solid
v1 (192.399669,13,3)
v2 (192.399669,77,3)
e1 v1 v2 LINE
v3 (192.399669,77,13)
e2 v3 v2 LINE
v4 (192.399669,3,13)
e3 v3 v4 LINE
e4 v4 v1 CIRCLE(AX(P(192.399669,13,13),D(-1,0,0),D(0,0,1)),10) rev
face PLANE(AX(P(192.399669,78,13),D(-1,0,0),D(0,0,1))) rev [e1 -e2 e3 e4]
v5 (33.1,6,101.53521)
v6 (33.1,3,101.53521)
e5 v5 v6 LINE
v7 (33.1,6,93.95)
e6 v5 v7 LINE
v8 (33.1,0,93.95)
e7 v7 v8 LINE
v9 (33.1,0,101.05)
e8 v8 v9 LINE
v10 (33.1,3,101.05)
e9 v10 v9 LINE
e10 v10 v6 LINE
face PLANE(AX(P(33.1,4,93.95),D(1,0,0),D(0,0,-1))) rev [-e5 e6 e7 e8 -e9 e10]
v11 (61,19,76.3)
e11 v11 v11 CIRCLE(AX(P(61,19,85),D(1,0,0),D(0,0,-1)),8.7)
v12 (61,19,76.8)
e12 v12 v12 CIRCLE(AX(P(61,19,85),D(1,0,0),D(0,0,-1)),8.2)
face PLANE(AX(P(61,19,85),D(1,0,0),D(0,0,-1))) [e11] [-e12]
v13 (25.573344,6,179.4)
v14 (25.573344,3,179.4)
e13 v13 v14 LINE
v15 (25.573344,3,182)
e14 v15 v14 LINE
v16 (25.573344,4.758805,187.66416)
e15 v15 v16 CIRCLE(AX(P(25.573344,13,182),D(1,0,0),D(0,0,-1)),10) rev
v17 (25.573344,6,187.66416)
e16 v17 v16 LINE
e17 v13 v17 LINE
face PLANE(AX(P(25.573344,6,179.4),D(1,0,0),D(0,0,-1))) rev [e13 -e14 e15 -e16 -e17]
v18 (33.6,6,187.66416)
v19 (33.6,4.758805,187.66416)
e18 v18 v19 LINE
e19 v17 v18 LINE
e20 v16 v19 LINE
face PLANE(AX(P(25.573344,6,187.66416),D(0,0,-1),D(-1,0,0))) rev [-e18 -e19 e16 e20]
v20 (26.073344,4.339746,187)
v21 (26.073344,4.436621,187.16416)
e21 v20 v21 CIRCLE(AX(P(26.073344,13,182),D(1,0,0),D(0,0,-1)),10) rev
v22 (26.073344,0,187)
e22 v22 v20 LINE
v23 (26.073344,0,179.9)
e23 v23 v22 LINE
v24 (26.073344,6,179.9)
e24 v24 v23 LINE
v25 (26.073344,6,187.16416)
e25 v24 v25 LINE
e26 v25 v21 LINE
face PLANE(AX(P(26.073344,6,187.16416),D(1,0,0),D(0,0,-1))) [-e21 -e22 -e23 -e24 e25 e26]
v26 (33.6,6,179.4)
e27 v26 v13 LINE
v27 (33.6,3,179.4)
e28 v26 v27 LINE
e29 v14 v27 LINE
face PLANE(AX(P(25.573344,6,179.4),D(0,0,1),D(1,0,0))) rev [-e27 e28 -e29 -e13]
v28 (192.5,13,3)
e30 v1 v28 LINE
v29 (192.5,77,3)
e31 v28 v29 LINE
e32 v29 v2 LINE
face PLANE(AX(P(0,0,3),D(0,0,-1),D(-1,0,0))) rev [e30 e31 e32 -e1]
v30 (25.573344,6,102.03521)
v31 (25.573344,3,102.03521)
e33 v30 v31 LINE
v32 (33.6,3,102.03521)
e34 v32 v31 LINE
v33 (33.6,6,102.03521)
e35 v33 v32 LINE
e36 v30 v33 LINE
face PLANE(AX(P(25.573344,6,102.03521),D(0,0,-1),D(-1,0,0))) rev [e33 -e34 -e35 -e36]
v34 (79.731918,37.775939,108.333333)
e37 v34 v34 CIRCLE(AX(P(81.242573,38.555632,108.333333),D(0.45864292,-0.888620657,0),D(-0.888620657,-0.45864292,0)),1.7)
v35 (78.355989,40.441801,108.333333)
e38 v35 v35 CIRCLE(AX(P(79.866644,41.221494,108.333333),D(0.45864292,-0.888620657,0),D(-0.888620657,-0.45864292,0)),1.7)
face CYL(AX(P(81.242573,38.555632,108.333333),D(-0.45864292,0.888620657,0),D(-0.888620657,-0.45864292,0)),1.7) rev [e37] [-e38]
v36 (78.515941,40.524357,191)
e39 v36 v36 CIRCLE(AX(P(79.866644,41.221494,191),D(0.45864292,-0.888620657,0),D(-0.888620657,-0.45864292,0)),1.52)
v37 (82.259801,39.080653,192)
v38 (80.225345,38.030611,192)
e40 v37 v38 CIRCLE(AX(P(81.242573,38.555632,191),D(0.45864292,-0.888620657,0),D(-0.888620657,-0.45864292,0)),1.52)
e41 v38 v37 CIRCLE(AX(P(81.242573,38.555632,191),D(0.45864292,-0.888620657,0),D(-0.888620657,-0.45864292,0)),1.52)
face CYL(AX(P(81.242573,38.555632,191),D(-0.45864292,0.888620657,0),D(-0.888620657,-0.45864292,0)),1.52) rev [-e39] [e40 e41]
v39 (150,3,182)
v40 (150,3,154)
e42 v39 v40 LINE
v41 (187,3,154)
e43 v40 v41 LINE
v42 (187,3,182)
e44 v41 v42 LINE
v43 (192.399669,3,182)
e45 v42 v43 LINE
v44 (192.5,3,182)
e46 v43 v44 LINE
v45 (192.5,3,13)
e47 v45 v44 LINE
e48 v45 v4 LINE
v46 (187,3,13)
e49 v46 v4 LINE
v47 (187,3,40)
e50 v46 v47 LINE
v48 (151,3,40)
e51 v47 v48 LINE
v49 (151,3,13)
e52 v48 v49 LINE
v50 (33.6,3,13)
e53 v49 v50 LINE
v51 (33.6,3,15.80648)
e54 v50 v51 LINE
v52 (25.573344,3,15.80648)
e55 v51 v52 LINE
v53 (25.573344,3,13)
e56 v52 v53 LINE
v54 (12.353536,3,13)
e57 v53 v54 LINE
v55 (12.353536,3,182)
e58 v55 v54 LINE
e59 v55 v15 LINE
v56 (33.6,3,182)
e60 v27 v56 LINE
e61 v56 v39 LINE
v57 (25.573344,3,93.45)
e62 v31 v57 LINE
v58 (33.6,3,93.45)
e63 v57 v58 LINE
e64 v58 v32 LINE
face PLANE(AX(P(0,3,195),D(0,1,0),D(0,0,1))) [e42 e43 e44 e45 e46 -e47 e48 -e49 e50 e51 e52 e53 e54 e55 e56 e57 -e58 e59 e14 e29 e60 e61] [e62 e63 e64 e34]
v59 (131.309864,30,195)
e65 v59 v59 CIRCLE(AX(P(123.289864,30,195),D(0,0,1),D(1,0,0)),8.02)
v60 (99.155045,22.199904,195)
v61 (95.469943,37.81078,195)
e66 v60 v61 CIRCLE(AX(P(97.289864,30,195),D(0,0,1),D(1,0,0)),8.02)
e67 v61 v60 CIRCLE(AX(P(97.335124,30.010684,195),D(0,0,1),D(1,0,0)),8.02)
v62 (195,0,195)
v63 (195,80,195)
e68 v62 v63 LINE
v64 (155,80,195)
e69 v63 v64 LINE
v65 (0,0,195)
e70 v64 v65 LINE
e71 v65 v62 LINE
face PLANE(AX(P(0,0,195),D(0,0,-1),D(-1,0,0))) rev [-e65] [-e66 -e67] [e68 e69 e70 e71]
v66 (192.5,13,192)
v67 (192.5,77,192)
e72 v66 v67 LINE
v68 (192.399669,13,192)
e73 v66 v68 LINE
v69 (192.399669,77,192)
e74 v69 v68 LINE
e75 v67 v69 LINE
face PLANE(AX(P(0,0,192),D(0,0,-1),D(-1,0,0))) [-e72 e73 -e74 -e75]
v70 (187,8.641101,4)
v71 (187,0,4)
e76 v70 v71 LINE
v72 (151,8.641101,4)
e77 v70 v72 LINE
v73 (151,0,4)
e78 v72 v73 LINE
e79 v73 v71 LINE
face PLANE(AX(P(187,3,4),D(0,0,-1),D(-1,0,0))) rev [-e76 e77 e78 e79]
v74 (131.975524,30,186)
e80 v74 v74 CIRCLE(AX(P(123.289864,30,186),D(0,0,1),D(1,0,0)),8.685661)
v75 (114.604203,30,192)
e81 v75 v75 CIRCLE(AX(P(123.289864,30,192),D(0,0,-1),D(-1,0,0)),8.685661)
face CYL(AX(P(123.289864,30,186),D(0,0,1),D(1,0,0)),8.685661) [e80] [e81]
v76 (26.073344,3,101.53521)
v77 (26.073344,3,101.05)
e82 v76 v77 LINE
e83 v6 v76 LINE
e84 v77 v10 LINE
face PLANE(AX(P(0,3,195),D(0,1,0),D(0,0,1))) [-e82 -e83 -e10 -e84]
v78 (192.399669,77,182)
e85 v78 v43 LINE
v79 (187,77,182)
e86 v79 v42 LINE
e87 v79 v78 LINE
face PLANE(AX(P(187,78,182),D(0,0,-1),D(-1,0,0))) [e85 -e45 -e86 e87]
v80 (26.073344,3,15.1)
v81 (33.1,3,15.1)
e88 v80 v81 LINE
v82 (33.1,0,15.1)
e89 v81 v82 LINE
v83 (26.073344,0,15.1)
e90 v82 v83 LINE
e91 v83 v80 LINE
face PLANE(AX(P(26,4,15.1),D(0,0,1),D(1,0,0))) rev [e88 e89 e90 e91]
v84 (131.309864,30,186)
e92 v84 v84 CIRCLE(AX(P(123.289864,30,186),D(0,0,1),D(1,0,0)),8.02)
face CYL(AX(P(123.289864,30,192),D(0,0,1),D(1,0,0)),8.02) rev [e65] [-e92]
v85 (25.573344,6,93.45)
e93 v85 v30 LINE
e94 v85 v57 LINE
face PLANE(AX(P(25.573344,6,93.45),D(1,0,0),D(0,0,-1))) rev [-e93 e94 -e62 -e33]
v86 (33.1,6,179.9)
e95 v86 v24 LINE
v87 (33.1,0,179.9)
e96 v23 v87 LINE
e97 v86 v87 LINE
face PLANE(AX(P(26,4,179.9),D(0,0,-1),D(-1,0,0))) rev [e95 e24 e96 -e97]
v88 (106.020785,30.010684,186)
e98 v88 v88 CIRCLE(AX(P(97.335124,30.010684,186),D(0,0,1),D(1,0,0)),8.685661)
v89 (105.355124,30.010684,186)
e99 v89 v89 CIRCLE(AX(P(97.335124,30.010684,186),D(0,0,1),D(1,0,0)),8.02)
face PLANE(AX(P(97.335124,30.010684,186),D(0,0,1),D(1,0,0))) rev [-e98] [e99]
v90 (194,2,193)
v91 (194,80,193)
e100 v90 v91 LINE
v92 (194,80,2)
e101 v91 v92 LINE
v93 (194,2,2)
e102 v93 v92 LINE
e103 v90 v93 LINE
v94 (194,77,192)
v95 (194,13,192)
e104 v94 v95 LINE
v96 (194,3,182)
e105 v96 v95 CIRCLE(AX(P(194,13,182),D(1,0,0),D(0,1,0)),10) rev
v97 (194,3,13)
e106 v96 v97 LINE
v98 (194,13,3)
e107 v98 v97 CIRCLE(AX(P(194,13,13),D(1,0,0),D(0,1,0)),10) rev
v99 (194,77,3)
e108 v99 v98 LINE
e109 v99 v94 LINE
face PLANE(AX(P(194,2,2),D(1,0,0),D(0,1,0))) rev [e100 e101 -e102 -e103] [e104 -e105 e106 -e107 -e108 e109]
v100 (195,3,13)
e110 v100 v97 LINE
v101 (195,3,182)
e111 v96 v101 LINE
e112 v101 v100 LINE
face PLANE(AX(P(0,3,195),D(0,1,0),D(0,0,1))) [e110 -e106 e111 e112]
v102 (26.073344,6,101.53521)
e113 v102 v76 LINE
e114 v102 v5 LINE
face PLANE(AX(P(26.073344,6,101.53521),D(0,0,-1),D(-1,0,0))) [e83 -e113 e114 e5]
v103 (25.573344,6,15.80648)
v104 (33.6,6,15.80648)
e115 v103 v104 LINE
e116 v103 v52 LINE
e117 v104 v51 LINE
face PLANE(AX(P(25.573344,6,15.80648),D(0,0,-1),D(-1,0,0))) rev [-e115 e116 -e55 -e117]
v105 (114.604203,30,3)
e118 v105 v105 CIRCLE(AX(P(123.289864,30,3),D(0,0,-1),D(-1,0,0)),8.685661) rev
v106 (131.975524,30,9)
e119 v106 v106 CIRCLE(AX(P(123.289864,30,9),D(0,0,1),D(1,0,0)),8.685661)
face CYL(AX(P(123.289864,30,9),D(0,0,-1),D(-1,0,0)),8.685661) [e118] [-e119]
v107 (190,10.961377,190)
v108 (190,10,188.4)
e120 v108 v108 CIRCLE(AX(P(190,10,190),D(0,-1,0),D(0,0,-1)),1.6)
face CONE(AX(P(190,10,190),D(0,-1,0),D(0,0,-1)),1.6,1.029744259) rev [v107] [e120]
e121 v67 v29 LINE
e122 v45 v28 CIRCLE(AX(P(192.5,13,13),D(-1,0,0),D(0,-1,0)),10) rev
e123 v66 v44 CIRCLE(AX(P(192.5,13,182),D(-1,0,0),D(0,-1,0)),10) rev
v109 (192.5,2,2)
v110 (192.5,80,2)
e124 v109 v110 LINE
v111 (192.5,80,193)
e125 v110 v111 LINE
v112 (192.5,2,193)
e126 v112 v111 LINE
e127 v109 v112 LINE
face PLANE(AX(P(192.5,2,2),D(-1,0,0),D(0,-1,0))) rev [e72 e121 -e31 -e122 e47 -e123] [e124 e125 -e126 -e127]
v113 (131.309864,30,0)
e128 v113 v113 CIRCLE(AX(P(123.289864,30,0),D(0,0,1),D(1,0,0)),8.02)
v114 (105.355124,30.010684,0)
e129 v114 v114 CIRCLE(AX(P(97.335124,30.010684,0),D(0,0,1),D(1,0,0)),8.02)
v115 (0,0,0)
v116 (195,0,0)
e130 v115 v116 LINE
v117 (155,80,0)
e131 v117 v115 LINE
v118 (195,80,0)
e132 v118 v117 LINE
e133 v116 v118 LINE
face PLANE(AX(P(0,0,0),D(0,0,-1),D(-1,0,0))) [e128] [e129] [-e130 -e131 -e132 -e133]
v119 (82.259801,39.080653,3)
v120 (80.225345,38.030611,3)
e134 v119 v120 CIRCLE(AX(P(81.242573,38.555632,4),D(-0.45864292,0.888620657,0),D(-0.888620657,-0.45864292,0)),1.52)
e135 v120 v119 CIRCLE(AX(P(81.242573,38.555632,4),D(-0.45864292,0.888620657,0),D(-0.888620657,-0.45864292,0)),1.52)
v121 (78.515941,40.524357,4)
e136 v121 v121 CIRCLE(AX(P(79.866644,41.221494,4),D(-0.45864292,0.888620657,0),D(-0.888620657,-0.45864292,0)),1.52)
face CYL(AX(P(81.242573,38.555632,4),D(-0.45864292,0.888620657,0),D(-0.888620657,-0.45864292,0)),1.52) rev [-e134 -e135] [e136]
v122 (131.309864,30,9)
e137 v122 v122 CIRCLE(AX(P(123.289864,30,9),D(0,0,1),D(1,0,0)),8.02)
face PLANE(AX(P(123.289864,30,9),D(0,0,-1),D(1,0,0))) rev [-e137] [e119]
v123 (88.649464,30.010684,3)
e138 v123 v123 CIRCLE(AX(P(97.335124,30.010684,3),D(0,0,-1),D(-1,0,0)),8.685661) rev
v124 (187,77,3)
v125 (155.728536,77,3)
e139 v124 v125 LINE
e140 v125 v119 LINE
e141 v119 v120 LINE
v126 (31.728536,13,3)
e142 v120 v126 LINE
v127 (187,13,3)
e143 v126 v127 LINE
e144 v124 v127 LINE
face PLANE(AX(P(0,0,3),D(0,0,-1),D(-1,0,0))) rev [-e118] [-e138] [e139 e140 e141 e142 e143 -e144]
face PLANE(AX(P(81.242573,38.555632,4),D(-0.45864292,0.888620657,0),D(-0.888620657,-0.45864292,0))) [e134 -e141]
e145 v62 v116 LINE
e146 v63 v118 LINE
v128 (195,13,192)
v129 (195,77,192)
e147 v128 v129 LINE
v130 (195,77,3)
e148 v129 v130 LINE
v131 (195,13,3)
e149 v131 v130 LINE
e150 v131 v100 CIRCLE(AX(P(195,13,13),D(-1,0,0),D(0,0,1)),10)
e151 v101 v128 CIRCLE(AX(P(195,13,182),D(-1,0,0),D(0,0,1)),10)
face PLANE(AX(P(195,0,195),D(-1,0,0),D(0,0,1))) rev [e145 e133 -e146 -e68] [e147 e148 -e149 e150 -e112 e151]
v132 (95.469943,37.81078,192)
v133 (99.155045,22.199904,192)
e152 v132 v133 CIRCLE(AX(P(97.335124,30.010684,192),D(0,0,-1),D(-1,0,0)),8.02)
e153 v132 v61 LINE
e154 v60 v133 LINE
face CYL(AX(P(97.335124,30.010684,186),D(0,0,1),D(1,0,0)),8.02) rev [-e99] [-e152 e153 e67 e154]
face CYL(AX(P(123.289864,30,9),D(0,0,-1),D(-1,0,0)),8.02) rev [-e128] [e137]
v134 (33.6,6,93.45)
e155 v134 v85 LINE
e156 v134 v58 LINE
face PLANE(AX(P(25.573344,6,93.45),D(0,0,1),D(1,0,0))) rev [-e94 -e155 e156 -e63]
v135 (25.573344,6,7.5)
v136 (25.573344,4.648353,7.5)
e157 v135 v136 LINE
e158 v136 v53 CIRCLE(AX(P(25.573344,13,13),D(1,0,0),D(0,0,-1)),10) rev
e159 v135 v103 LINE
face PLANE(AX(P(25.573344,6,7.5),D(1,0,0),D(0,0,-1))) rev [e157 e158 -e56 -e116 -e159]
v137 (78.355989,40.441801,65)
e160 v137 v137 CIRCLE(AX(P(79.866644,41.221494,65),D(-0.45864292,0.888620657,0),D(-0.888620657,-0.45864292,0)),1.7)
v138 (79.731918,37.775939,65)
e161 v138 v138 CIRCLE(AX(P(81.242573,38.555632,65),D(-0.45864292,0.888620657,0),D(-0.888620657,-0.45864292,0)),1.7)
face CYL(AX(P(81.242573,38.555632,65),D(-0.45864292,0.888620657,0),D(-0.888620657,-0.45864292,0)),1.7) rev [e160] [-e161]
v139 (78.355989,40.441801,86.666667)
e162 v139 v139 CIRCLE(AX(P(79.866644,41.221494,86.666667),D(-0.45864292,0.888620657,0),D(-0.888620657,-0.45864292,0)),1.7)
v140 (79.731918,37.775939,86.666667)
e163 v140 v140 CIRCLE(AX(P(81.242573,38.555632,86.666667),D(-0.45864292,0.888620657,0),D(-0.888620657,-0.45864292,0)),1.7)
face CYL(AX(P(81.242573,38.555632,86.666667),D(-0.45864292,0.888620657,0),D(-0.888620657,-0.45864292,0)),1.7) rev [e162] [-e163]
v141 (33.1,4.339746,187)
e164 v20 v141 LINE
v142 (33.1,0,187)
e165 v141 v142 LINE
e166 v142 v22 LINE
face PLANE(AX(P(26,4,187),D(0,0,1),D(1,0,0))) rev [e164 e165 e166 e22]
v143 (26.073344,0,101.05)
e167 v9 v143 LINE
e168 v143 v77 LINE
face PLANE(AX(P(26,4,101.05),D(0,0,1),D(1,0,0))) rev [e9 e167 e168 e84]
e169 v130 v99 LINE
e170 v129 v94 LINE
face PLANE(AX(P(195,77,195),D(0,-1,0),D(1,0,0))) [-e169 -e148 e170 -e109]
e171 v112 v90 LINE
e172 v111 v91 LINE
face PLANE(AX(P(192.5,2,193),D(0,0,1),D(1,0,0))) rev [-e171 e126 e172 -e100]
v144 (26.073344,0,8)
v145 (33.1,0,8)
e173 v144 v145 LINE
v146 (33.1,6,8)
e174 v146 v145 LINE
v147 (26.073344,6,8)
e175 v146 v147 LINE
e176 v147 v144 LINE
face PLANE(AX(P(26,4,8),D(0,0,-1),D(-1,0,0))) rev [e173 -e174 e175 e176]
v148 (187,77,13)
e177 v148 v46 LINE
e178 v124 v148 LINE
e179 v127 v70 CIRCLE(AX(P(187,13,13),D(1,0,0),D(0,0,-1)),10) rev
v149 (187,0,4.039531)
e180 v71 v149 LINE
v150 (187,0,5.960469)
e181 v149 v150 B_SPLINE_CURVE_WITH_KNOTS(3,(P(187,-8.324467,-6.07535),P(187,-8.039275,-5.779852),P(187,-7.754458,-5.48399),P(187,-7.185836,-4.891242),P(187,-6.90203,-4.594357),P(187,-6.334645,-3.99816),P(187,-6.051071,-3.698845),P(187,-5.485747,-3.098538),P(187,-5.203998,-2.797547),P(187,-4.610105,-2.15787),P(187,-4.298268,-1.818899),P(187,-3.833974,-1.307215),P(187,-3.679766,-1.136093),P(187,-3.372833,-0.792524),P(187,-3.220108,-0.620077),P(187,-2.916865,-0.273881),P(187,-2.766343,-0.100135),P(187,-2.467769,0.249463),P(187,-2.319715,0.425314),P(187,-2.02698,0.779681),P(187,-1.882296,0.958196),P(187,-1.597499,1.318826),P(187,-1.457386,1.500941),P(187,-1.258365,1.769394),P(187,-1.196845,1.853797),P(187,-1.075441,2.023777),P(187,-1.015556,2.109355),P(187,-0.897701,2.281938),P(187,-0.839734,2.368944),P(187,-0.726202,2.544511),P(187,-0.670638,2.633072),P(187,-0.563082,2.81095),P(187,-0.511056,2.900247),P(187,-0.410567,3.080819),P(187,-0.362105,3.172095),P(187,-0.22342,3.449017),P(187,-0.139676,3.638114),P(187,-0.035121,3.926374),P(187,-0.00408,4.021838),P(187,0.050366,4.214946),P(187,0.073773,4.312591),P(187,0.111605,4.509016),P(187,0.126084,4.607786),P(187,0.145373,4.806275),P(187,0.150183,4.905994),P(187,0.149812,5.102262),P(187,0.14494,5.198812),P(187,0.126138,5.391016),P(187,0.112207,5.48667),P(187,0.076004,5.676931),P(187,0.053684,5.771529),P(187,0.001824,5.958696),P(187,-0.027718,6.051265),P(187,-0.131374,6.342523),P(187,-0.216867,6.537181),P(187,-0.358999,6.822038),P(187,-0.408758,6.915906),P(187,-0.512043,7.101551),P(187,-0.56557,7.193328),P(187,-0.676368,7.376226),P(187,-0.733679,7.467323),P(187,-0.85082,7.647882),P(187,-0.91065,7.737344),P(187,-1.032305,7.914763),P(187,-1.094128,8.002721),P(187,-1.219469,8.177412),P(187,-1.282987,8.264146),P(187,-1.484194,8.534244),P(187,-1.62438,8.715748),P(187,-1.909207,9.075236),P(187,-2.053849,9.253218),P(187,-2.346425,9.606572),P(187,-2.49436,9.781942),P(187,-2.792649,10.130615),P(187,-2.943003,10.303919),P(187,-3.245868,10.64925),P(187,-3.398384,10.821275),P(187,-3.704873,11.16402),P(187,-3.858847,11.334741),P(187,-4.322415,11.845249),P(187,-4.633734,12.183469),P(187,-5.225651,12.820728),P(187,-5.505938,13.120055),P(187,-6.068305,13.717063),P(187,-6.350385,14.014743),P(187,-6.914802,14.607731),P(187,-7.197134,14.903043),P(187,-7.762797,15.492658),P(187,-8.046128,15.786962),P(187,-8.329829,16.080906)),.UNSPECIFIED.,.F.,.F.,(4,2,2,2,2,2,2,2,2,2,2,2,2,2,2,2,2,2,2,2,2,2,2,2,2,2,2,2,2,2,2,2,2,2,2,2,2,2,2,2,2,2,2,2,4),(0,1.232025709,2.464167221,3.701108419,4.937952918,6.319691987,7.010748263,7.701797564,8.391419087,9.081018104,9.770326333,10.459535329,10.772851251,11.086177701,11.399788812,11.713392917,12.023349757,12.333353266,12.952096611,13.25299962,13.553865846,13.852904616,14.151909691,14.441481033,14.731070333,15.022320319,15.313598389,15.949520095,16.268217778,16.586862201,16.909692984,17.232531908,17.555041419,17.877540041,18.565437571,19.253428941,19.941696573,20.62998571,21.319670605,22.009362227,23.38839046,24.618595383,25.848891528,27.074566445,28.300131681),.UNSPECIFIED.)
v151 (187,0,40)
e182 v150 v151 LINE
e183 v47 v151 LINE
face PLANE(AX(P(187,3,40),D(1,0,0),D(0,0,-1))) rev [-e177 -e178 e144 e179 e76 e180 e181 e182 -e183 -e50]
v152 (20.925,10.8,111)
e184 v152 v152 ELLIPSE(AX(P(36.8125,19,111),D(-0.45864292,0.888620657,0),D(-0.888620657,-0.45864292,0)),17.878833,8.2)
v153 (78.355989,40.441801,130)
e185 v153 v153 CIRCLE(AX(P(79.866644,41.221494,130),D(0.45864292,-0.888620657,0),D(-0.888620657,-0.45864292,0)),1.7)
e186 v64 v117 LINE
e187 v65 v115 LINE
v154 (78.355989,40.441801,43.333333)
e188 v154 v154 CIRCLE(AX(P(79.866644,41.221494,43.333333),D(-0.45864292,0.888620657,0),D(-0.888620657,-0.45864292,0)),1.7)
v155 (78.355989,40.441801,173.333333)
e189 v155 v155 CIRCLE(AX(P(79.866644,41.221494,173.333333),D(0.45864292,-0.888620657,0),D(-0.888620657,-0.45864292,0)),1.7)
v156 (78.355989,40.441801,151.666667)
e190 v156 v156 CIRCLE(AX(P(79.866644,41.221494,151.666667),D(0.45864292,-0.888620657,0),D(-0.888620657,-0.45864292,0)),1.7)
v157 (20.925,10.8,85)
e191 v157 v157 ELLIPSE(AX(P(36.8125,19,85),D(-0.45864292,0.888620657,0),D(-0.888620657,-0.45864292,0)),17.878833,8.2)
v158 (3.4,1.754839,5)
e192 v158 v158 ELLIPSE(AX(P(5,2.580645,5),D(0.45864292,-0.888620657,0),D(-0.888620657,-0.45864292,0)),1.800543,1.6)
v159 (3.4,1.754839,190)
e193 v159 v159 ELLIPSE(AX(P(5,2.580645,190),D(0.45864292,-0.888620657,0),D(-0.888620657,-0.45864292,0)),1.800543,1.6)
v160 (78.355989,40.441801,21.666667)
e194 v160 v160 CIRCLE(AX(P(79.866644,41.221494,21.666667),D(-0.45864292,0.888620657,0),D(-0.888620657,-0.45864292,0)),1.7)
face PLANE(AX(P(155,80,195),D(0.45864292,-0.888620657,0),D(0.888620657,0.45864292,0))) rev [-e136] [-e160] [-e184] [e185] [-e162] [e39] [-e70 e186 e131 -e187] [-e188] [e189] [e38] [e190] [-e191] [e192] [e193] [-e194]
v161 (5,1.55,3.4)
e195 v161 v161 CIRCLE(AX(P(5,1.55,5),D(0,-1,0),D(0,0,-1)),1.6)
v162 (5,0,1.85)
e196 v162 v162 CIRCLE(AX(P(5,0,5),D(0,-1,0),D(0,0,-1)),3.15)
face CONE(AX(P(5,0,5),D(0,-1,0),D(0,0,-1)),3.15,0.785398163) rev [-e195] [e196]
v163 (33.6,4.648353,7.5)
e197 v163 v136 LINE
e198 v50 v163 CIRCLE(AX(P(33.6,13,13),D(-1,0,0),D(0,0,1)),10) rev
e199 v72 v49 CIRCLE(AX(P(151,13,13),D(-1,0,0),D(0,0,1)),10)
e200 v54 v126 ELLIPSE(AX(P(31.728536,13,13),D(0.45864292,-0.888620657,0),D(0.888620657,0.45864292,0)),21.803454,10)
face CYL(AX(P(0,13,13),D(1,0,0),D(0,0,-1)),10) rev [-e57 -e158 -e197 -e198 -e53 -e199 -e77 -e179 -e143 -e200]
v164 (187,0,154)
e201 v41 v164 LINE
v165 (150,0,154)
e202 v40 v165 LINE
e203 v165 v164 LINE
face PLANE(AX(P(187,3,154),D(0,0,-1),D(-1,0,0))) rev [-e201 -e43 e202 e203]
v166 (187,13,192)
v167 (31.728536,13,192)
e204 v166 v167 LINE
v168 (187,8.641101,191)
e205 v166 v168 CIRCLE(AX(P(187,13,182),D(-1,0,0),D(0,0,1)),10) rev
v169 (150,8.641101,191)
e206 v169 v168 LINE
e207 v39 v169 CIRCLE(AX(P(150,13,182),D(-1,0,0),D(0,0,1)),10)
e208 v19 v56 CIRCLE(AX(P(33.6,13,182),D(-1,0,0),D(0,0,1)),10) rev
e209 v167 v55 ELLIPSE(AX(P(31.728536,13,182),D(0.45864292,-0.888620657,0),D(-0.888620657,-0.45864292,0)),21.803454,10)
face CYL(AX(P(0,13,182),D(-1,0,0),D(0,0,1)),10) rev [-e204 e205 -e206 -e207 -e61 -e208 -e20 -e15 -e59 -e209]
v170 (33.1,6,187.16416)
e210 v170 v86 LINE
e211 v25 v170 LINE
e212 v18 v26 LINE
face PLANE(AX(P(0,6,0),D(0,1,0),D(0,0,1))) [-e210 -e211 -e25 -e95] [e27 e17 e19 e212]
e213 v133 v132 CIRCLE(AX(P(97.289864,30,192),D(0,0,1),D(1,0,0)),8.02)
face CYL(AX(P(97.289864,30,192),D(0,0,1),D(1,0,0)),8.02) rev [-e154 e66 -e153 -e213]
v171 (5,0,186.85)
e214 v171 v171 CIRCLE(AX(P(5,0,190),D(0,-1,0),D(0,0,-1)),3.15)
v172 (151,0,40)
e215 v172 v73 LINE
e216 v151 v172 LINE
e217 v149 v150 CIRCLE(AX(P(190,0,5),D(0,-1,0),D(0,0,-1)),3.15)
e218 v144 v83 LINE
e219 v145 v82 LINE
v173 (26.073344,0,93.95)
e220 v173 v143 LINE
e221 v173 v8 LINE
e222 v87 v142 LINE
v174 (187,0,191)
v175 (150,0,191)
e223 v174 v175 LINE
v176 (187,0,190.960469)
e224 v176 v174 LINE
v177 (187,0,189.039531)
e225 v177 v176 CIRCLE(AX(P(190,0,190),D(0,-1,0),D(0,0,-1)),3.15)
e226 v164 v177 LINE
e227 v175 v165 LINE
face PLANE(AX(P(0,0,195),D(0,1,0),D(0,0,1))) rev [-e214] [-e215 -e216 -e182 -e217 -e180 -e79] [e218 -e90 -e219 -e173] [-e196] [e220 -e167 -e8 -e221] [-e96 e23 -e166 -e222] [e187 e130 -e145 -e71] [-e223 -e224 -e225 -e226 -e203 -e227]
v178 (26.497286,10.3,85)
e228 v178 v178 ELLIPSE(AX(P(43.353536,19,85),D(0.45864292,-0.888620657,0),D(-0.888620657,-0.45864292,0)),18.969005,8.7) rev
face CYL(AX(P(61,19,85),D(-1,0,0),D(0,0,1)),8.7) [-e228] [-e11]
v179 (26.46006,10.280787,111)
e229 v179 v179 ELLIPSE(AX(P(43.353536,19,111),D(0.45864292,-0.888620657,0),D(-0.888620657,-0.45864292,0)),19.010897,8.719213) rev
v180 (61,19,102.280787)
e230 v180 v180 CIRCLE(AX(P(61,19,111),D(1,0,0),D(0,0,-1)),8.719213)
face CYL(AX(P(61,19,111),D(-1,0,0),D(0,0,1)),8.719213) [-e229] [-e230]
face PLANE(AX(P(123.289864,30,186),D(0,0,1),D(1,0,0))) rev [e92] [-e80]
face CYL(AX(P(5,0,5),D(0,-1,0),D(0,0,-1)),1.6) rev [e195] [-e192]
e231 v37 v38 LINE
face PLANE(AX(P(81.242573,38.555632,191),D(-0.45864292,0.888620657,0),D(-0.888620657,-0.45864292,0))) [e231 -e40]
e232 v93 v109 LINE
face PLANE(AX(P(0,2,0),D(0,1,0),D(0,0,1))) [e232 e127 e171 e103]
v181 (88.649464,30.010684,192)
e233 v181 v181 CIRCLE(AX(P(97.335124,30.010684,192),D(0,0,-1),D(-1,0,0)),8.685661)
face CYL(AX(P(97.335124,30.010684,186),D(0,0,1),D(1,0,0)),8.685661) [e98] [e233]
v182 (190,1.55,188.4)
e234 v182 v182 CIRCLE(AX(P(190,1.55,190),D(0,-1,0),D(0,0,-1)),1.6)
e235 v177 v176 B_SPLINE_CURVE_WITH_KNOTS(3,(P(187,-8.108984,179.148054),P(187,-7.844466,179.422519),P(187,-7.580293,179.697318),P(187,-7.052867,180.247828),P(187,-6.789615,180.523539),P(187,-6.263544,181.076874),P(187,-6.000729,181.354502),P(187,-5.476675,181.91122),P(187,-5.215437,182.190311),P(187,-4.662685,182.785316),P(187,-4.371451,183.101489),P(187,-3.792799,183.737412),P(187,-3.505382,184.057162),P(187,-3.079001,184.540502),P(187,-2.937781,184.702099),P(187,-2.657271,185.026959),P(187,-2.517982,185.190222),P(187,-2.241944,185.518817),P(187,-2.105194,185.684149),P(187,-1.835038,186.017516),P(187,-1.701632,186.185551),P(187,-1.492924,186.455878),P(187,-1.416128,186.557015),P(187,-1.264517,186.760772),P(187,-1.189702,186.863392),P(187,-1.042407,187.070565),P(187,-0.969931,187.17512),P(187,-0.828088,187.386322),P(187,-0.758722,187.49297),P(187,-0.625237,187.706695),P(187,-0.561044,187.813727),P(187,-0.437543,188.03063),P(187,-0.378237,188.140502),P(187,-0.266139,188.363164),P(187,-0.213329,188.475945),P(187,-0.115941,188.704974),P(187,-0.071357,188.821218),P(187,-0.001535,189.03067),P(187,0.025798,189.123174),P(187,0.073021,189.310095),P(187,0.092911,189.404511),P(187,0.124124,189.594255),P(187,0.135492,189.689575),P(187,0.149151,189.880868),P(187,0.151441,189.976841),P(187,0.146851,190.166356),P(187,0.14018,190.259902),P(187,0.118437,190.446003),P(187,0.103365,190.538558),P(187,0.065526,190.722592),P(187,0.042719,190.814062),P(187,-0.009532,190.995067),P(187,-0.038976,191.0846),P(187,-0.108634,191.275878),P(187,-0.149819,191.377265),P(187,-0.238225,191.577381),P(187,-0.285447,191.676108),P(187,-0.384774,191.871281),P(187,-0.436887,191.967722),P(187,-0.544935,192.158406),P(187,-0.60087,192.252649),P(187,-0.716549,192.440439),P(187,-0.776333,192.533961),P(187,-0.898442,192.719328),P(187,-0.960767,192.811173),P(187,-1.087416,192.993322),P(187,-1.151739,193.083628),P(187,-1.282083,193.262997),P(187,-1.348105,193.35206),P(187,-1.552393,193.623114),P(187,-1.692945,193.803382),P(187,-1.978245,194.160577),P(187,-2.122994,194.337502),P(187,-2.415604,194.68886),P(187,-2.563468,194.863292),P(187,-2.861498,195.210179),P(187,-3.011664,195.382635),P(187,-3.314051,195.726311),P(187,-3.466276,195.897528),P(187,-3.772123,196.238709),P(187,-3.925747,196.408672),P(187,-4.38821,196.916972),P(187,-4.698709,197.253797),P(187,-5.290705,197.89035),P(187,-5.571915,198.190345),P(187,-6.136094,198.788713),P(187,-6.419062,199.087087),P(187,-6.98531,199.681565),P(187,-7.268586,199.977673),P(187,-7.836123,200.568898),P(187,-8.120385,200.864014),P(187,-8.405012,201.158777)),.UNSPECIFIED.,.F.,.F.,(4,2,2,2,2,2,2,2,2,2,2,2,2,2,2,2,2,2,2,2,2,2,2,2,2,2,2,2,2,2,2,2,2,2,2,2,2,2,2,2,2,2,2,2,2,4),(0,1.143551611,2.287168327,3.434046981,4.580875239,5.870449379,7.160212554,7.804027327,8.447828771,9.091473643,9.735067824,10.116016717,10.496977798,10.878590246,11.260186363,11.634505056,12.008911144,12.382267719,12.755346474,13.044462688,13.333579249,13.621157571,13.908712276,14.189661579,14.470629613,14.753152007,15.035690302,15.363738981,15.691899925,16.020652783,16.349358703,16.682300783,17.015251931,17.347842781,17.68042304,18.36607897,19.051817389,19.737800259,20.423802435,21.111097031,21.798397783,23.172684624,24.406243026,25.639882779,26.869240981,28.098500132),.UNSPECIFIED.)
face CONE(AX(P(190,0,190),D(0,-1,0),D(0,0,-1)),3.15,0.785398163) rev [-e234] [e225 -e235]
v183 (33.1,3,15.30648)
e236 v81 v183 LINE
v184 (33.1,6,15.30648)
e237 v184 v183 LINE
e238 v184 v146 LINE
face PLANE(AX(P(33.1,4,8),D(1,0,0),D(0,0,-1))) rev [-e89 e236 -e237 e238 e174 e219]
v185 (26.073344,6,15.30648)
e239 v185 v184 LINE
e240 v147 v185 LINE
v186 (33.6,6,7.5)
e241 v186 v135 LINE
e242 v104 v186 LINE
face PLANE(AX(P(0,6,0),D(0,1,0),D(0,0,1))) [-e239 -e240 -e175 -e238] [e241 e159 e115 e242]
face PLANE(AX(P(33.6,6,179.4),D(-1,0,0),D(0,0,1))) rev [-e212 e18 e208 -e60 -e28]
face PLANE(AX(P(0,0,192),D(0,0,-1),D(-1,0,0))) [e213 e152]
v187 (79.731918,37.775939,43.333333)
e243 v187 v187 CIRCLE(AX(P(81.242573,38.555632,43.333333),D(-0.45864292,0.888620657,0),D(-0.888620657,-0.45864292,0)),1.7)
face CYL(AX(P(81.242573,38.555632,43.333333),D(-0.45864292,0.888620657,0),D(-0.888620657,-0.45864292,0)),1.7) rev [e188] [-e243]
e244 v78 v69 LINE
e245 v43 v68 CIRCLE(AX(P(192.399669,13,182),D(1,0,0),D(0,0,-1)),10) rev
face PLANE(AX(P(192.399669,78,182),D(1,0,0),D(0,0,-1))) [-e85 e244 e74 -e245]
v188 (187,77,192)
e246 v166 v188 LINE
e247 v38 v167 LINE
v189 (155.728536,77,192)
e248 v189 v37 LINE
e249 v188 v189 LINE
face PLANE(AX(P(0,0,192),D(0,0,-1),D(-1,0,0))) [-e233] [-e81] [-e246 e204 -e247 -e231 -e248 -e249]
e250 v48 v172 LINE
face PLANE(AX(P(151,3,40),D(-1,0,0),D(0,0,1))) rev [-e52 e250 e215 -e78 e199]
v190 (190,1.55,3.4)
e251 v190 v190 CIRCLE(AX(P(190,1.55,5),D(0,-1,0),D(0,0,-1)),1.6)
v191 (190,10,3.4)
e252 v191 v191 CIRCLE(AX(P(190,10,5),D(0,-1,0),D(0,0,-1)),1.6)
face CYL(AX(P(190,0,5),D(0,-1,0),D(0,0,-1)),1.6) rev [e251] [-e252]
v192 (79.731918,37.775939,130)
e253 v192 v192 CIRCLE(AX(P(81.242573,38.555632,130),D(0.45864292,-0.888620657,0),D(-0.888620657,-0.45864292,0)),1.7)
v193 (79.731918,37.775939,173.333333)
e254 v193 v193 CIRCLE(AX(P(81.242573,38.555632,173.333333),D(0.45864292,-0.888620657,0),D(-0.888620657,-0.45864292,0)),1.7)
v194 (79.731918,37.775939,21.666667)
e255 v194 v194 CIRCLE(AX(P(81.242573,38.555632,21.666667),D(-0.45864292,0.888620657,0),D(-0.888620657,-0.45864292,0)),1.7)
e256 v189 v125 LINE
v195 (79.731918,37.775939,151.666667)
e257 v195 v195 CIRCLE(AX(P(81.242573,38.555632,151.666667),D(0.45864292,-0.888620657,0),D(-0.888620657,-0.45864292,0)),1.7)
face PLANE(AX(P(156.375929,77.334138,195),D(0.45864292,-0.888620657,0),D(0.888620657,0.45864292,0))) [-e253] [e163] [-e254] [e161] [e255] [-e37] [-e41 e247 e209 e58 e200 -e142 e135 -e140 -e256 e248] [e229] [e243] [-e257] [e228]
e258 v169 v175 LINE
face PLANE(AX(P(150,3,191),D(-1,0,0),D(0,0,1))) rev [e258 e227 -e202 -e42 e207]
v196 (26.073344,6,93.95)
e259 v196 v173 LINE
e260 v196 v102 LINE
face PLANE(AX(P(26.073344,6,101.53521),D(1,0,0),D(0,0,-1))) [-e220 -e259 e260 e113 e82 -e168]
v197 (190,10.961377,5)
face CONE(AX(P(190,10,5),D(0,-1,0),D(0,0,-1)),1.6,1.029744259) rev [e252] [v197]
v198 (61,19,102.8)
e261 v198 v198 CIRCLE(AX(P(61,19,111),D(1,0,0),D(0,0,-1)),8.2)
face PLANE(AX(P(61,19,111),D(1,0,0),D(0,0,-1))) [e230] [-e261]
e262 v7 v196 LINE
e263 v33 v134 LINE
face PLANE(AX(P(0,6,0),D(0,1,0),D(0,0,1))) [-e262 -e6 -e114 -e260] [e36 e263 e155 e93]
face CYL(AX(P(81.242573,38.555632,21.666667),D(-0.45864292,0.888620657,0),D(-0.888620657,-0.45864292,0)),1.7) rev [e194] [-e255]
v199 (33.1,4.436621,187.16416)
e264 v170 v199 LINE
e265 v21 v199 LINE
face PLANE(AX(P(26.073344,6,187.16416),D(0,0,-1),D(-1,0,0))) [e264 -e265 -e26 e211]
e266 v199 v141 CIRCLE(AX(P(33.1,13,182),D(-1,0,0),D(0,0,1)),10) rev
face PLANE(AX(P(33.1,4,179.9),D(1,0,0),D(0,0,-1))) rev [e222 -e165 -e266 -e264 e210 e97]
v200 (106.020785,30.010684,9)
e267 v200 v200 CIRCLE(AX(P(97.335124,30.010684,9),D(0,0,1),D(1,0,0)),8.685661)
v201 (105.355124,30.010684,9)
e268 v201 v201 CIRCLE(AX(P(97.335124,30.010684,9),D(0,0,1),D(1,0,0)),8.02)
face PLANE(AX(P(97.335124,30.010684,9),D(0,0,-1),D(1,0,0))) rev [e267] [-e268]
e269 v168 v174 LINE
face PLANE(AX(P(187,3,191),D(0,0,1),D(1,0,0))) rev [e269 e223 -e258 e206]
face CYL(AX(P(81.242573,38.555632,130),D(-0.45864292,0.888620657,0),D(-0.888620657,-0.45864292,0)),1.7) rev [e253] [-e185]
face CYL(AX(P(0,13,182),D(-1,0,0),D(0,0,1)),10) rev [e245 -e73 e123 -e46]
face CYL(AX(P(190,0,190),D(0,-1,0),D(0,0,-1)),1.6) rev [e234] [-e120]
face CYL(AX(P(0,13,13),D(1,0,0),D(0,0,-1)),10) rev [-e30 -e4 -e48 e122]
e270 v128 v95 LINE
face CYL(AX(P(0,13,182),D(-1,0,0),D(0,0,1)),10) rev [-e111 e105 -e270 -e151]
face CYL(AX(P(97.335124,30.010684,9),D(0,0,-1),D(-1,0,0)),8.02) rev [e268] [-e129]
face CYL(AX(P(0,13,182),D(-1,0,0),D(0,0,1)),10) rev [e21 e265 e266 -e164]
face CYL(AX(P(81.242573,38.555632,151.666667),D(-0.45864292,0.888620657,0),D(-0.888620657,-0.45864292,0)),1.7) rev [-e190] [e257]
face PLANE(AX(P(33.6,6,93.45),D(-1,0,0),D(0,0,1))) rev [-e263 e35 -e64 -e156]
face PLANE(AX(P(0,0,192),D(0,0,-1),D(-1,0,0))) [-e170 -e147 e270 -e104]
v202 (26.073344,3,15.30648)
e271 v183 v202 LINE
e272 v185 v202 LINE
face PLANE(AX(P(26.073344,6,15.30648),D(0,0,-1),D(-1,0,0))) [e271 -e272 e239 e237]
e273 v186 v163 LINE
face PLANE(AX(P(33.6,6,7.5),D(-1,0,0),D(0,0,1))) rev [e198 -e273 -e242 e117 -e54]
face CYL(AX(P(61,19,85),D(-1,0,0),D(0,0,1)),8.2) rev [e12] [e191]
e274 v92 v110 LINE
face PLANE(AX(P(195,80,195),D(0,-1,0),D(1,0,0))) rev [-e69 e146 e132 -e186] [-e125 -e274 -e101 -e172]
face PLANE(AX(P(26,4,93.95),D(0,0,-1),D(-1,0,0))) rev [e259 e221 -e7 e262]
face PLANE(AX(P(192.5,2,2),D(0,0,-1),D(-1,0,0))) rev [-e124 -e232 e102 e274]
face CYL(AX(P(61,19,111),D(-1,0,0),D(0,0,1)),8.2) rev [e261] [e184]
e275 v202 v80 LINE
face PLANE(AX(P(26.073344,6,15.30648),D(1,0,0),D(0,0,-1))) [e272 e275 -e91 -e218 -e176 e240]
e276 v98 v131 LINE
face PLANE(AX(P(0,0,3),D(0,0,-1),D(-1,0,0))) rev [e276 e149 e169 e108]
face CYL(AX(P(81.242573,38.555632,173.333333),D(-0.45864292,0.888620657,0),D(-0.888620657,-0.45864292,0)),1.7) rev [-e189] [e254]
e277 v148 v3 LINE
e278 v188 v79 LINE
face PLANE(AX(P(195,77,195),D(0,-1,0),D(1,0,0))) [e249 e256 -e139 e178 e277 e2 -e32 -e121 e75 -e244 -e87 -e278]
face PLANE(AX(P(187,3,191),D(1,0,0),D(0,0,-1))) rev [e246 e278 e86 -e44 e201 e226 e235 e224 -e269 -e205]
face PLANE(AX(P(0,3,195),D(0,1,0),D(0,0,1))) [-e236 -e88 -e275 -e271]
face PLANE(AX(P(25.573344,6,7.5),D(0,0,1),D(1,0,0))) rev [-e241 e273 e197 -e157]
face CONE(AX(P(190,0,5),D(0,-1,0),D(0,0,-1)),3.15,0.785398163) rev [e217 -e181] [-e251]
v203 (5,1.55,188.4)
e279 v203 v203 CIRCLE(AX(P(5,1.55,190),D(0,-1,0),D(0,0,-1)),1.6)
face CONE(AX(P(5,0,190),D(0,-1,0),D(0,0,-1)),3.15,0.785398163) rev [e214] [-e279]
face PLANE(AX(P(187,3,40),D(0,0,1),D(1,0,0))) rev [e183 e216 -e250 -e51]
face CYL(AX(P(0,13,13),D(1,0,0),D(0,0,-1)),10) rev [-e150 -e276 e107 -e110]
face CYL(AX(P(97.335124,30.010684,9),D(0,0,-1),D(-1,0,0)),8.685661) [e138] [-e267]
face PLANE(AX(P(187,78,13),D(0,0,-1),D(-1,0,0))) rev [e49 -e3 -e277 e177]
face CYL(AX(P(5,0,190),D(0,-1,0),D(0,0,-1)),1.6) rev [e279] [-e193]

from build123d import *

# Parameters (mm, degrees)
ROBOT_DEPTH                 = 195
VACIO_POR_DENTRO_3MM_T      = -3
SKETCH3_R                   = 8.02
ULTRASONICO_DERECHA_DEPTH   = 3
SKETCH9_R                   = 8.2
ULTRASONICO_IZQUIERDA_DEPTH = 3
ULTRASONICO_CENTRO_R        = 8.7
CUT_EXTRUDE4_DEPTH          = 75
SKETCH16_R                  = 8.685660505
SKETCH16_R_2                = 8.02
BOSS_EXTRUDE1_DEPTH         = 9
SKETCH18_R                  = 8.7
SKETCH18_R_2                = 8.2
SKETCH18_R_3                = 8.719213476
BOSS_EXTRUDE2_DEPTH         = 60
SKETCH10_W                  = 37
SKETCH10_H                  = 37
RUEDA_DERECHA_DEPTH         = 3
SKETCH12_W                  = 36
SKETCH12_H                  = 36
RUEDA_IZQUIERDA_DEPTH       = 3
SKETCH14_W                  = 7.1
SKETCH14_H                  = 7.1
CYN70_DERECHA_DEPTH         = 4
SKETCH15_W                  = 7.1
SKETCH15_H                  = 7.1
CNY70_CENTRO_DEPTH          = 4
SKETCH13_W                  = 7.1
SKETCH13_H                  = 7.1
CNY70_IZQUIERDA_DEPTH       = 4
RDONDEO_R                   = 10
SKETCH23_W                  = 76.592532913
SKETCH23_H                  = 65.967934853
CUT_EXTRUDE5_DEPTH          = 25
SKETCH24_W                  = 1.5
SKETCH24_H                  = 191
CUT_EXTRUDE6_DEPTH          = 78
SKETCH25_W                  = 5.39966948
SKETCH25_H                  = 12.093031456
BOSS_EXTRUDE3_DEPTH         = 75
SKETCH38_W                  = 8.026655699
SKETCH38_H                  = 8.306480136
SKETCH38_W_2                = 7.026655699
SKETCH38_H_2                = 7.306480136
SKETCH38_H_3                = 8.585210253
SKETCH38_H_4                = 7.585210253
SKETCH38_H_5                = 8.264160011
SKETCH38_H_6                = 7.264160011
BOSS_EXTRUDE4_DEPTH         = 6
SKETCH40_R                  = 1.7
SKETCH40_R_2                = 1.52
AGUJEROS_RAMPA_DEPTH        = 3


with BuildPart() as part:
    # Sketch2 → Robot (new body)
    with BuildSketch(Plane.XY):
        Polygon((0, 0), (195, 0), (195, 80), (155, 80), align=None)
    extrude(amount=ROBOT_DEPTH)

    # Vacio por dentro 3mm
    vacio_por_dentro_3mm_openings = [part.faces().sort_by_distance(p)[0] for p in [
        (195, 40, 97.5),
    ]]
    offset(amount=VACIO_POR_DENTRO_3MM_T, openings=vacio_por_dentro_3mm_openings, kind=Kind.INTERSECTION)

    # Sketch3 → Ultrasonico Derecha (cut)
    with BuildSketch(Plane.XY.offset(195)):
        with Locations((97.289863967, 30)):
            Circle(SKETCH3_R)
        with Locations((123.289863967, 30)):
            Circle(SKETCH3_R)
    extrude(amount=-ULTRASONICO_DERECHA_DEPTH, mode=Mode.SUBTRACT)

    # Sketch9 → Ultrasonico Izquierda (cut)
    with BuildSketch(Plane(origin=(0, 0, 0), x_dir=(-1, 0, 0), z_dir=(0, 0, -1))):
        with Locations((-97.284004153, 30)):
            Circle(SKETCH9_R)
        with Locations((-123.284004153, 30)):
            Circle(SKETCH9_R)
    extrude(amount=-ULTRASONICO_IZQUIERDA_DEPTH, mode=Mode.SUBTRACT)

    # Ultrasonico Centro → Cut-Extrude4 (cut)
    with BuildSketch(Plane(origin=(0, 0, 0), x_dir=(0, 0, -1), z_dir=(1, 0, 0))):
        with Locations(Location((-85, 19, 0), (0, 0, 270))):
            Circle(ULTRASONICO_CENTRO_R)
        with Locations(Location((-111, 19, 0), (0, 0, 270))):
            Circle(ULTRASONICO_CENTRO_R)
    extrude(amount=CUT_EXTRUDE4_DEPTH, mode=Mode.SUBTRACT)

    # Sketch16 → Boss-Extrude1 (add)
    # profile 1 of 2: a face of its own
    with BuildSketch(Plane.XY.offset(195)):
        with Locations((123.289863967, 30)):
            Circle(SKETCH16_R)
        with Locations((123.289863967, 30)):
            Circle(SKETCH16_R_2, mode=Mode.SUBTRACT)
    # profile 2 of 2: a face of its own
    with BuildSketch(Plane.XY.offset(195)):
        with Locations((97.335124092, 30.010684101)):
            Circle(SKETCH16_R)
        with Locations((97.335124092, 30.010684101)):
            Circle(SKETCH16_R_2, mode=Mode.SUBTRACT)
    boss_extrude1 = extrude(amount=-BOSS_EXTRUDE1_DEPTH)

    # Sketch18 → Boss-Extrude2 (add)
    # profile 1 of 2: a face of its own
    with BuildSketch(Plane(origin=(1, 0, 0), x_dir=(0, 0, -1), z_dir=(1, 0, 0))):
        with Locations(Location((-85, 19, 0), (0, 0, 270))):
            Circle(SKETCH18_R)
        with Locations((-85, 19)):
            Circle(SKETCH18_R_2, mode=Mode.SUBTRACT)
    # profile 2 of 2: a face of its own
    with BuildSketch(Plane(origin=(1, 0, 0), x_dir=(0, 0, -1), z_dir=(1, 0, 0))):
        with Locations(Location((-111, 19, 0), (0, 0, 270))):
            Circle(SKETCH18_R_3)
        with Locations((-111, 19)):
            Circle(SKETCH18_R_2, mode=Mode.SUBTRACT)
    extrude(amount=BOSS_EXTRUDE2_DEPTH)

    # Mirror1: Boss-Extrude1 across plane
    add(boss_extrude1.mirror(Plane.XY.offset(97.5)))

    # Sketch10 → Rueda Derecha (cut)
    with BuildSketch(Plane(origin=(0, 0, 0), x_dir=(-1, 0, 0), z_dir=(0, -1, 0))):
        with Locations((-168.5, -172.5)):
            Rectangle(SKETCH10_W, SKETCH10_H)
    extrude(amount=-RUEDA_DERECHA_DEPTH, mode=Mode.SUBTRACT)

    # Sketch12 → Rueda Izquierda (cut)
    with BuildSketch(Plane(origin=(0, 0, 0), x_dir=(-1, 0, 0), z_dir=(0, -1, 0))):
        with Locations((-169, -22)):
            Rectangle(SKETCH12_W, SKETCH12_H)
    extrude(amount=-RUEDA_IZQUIERDA_DEPTH, mode=Mode.SUBTRACT)

    # Sketch14 → Cyn70 Derecha (cut)
    with BuildSketch(Plane(origin=(0, 0, 0), x_dir=(-1, 0, 0), z_dir=(0, -1, 0))):
        with Locations((-29.55, -183.45)):
            Rectangle(SKETCH14_W, SKETCH14_H)
    extrude(amount=-CYN70_DERECHA_DEPTH, mode=Mode.SUBTRACT)

    # Sketch15 → Cny70 Centro (cut)
    with BuildSketch(Plane(origin=(0, 0, 0), x_dir=(-1, 0, 0), z_dir=(0, -1, 0))):
        with Locations((-29.55, -97.5)):
            Rectangle(SKETCH15_W, SKETCH15_H)
    extrude(amount=-CNY70_CENTRO_DEPTH, mode=Mode.SUBTRACT)

    # Sketch13 → Cny70 Izquierda (cut)
    with BuildSketch(Plane.XZ):
        with Locations((29.55, 11.55)):
            Rectangle(SKETCH13_W, SKETCH13_H)
    extrude(amount=-CNY70_IZQUIERDA_DEPTH, mode=Mode.SUBTRACT)

    # Rdondeo
    # the kernel refuses this fillet: 10 mm, written as the material it adds along each edge
    with BuildSketch(Plane(origin=(-12.646463672, 3, 3), x_dir=(0, 0, 1), z_dir=(1, 0, 0))) as rdondeo_piece_1_section:
        with BuildLine():
            CenterArc((RDONDEO_R, -RDONDEO_R), RDONDEO_R, 90, 90)
            Line((0, -RDONDEO_R), (0, 0))
            Line((0, 0), (RDONDEO_R, 0))
        make_face()
    rdondeo_piece_1 = extrude(amount=232.646463672, mode=Mode.PRIVATE)
    rdondeo_piece_1 = split(rdondeo_piece_1, bisect_by=Plane(origin=(26, 3.382720795, 9.257724248), z_dir=(-1, 0, 0)), keep=Keep.TOP, mode=Mode.PRIVATE)
    rdondeo_piece_1 = split(rdondeo_piece_1, bisect_by=Plane(origin=(18.190230172, 6.012487145, 9.257724248), z_dir=(0.4586429197702524, -0.8886206570548638, 0)), keep=Keep.TOP, mode=Mode.PRIVATE)
    add(rdondeo_piece_1)
    with BuildSketch(Plane(origin=(-12.646463672, 3, 3), x_dir=(0, 0, 1), z_dir=(1, 0, 0))) as rdondeo_piece_2_section:
        with BuildLine():
            CenterArc((RDONDEO_R, -RDONDEO_R), RDONDEO_R, 90, 90)
            Line((0, -RDONDEO_R), (0, 0))
            Line((0, 0), (RDONDEO_R, 0))
        make_face()
    rdondeo_piece_2 = extrude(amount=232.646463672, mode=Mode.PRIVATE)
    rdondeo_piece_2 = split(rdondeo_piece_2, bisect_by=Plane(origin=(29.55, 4.766890381, 8), z_dir=(0, 0, -1)), keep=Keep.TOP, mode=Mode.PRIVATE)
    rdondeo_piece_2 = split(rdondeo_piece_2, bisect_by=Plane(origin=(151, 4.766890381, 5.549307676), z_dir=(-1, 0, 0)), keep=Keep.TOP, mode=Mode.PRIVATE)
    rdondeo_piece_2 = split(rdondeo_piece_2, bisect_by=Plane(origin=(26.652779728, 10.380254658, 5.549307676), z_dir=(0.4586429197702524, -0.8886206570548638, 0)), keep=Keep.TOP, mode=Mode.PRIVATE)
    add(rdondeo_piece_2)
    with BuildSketch(Plane(origin=(-12.646463672, 3, 3), x_dir=(0, 0, 1), z_dir=(1, 0, 0))) as rdondeo_piece_3_section:
        with BuildLine():
            CenterArc((RDONDEO_R, -RDONDEO_R), RDONDEO_R, 90, 90)
            Line((0, -RDONDEO_R), (0, 0))
            Line((0, 0), (RDONDEO_R, 0))
        make_face()
    rdondeo_piece_3 = extrude(amount=232.646463672, mode=Mode.PRIVATE)
    rdondeo_piece_3 = split(rdondeo_piece_3, bisect_by=Plane(origin=(33.1, 3.396845927, 9.232636126), z_dir=(1, 0, 0)), keep=Keep.TOP, mode=Mode.PRIVATE)
    rdondeo_piece_3 = split(rdondeo_piece_3, bisect_by=Plane(origin=(151, 3.396845927, 9.232636126), z_dir=(-1, 0, 0)), keep=Keep.TOP, mode=Mode.PRIVATE)
    add(rdondeo_piece_3)
    with BuildSketch(Plane(origin=(-12.646463672, 3, 3), x_dir=(0, 0, 1), z_dir=(1, 0, 0))) as rdondeo_piece_4_section:
        with BuildLine():
            CenterArc((RDONDEO_R, -RDONDEO_R), RDONDEO_R, 90, 90)
            Line((0, -RDONDEO_R), (0, 0))
            Line((0, 0), (RDONDEO_R, 0))
        make_face()
    rdondeo_piece_4 = extrude(amount=207.646463672, mode=Mode.PRIVATE)
    rdondeo_piece_4 = split(rdondeo_piece_4, bisect_by=Plane(origin=(187, 3.396845927, 9.232636126), z_dir=(1, 0, 0)), keep=Keep.TOP, mode=Mode.PRIVATE)
    add(rdondeo_piece_4)
    with BuildSketch(Plane(origin=(-12.646463672, 3, 3), x_dir=(0, 0, 1), z_dir=(1, 0, 0))) as rdondeo_piece_5_section:
        with BuildLine():
            CenterArc((RDONDEO_R, -RDONDEO_R), RDONDEO_R, 90, 90)
            Line((0, -RDONDEO_R), (0, 0))
            Line((0, 0), (RDONDEO_R, 0))
        make_face()
    rdondeo_piece_5 = extrude(amount=232.646463672, mode=Mode.PRIVATE)
    rdondeo_piece_5 = split(rdondeo_piece_5, bisect_by=Plane(origin=(187, 6.605810426, 3.459165083), z_dir=(-1, 0, 0)), keep=Keep.TOP, mode=Mode.PRIVATE)
    rdondeo_piece_5 = split(rdondeo_piece_5, bisect_by=Plane(origin=(169, 6.605810426, 4), z_dir=(0, 0, -1)), keep=Keep.TOP, mode=Mode.PRIVATE)
    rdondeo_piece_5 = split(rdondeo_piece_5, bisect_by=Plane(origin=(137.518477626, 67.601260025, 3.459165083), z_dir=(0.4586429197702524, -0.8886206570548638, 0)), keep=Keep.TOP, mode=Mode.PRIVATE)
    add(rdondeo_piece_5)
    with BuildSketch(Plane(origin=(-12.646463672, 3, 192), x_dir=(0, 0, -1), z_dir=(1, 0, 0))) as rdondeo_piece_6_section:
        with BuildLine():
            CenterArc((RDONDEO_R, RDONDEO_R), RDONDEO_R, 180, 90)
            Line((0, RDONDEO_R), (0, 0))
            Line((0, 0), (RDONDEO_R, 0))
        make_face()
    rdondeo_piece_6 = extrude(amount=232.646463672, mode=Mode.PRIVATE)
    rdondeo_piece_6 = split(rdondeo_piece_6, bisect_by=Plane(origin=(26, 3.382720795, 185.742275752), z_dir=(-1, 0, 0)), keep=Keep.TOP, mode=Mode.PRIVATE)
    rdondeo_piece_6 = split(rdondeo_piece_6, bisect_by=Plane(origin=(18.190230172, 6.012487145, 185.742275752), z_dir=(0.4586429197702524, -0.8886206570548638, 0)), keep=Keep.TOP, mode=Mode.PRIVATE)
    add(rdondeo_piece_6)
    with BuildSketch(Plane(origin=(-12.646463672, 3, 192), x_dir=(0, 0, -1), z_dir=(1, 0, 0))) as rdondeo_piece_7_section:
        with BuildLine():
            CenterArc((RDONDEO_R, RDONDEO_R), RDONDEO_R, 180, 90)
            Line((0, RDONDEO_R), (0, 0))
            Line((0, 0), (RDONDEO_R, 0))
        make_face()
    rdondeo_piece_7 = extrude(amount=232.646463672, mode=Mode.PRIVATE)
    rdondeo_piece_7 = split(rdondeo_piece_7, bisect_by=Plane(origin=(29.55, 4.766890381, 187), z_dir=(0, 0, 1)), keep=Keep.TOP, mode=Mode.PRIVATE)
    rdondeo_piece_7 = split(rdondeo_piece_7, bisect_by=Plane(origin=(150, 4.766890381, 189.450692324), z_dir=(-1, 0, 0)), keep=Keep.TOP, mode=Mode.PRIVATE)
    rdondeo_piece_7 = split(rdondeo_piece_7, bisect_by=Plane(origin=(26.652779728, 10.380254658, 189.450692324), z_dir=(0.4586429197702524, -0.8886206570548638, 0)), keep=Keep.TOP, mode=Mode.PRIVATE)
    add(rdondeo_piece_7)
    with BuildSketch(Plane(origin=(-12.646463672, 3, 192), x_dir=(0, 0, -1), z_dir=(1, 0, 0))) as rdondeo_piece_8_section:
        with BuildLine():
            CenterArc((RDONDEO_R, RDONDEO_R), RDONDEO_R, 180, 90)
            Line((0, RDONDEO_R), (0, 0))
            Line((0, 0), (RDONDEO_R, 0))
        make_face()
    rdondeo_piece_8 = extrude(amount=232.646463672, mode=Mode.PRIVATE)
    rdondeo_piece_8 = split(rdondeo_piece_8, bisect_by=Plane(origin=(33.1, 3.396845927, 185.767363874), z_dir=(1, 0, 0)), keep=Keep.TOP, mode=Mode.PRIVATE)
    rdondeo_piece_8 = split(rdondeo_piece_8, bisect_by=Plane(origin=(150, 3.396845927, 185.767363874), z_dir=(-1, 0, 0)), keep=Keep.TOP, mode=Mode.PRIVATE)
    add(rdondeo_piece_8)
    with BuildSketch(Plane(origin=(-12.646463672, 3, 192), x_dir=(0, 0, -1), z_dir=(1, 0, 0))) as rdondeo_piece_9_section:
        with BuildLine():
            CenterArc((RDONDEO_R, RDONDEO_R), RDONDEO_R, 180, 90)
            Line((0, RDONDEO_R), (0, 0))
            Line((0, 0), (RDONDEO_R, 0))
        make_face()
    rdondeo_piece_9 = extrude(amount=207.646463672, mode=Mode.PRIVATE)
    rdondeo_piece_9 = split(rdondeo_piece_9, bisect_by=Plane(origin=(187, 3.396845927, 185.767363874), z_dir=(1, 0, 0)), keep=Keep.TOP, mode=Mode.PRIVATE)
    add(rdondeo_piece_9)
    with BuildSketch(Plane(origin=(-12.646463672, 3, 192), x_dir=(0, 0, -1), z_dir=(1, 0, 0))) as rdondeo_piece_10_section:
        with BuildLine():
            CenterArc((RDONDEO_R, RDONDEO_R), RDONDEO_R, 180, 90)
            Line((0, RDONDEO_R), (0, 0))
            Line((0, 0), (RDONDEO_R, 0))
        make_face()
    rdondeo_piece_10 = extrude(amount=232.646463672, mode=Mode.PRIVATE)
    rdondeo_piece_10 = split(rdondeo_piece_10, bisect_by=Plane(origin=(187, 6.605810426, 191.540834917), z_dir=(-1, 0, 0)), keep=Keep.TOP, mode=Mode.PRIVATE)
    rdondeo_piece_10 = split(rdondeo_piece_10, bisect_by=Plane(origin=(168.5, 6.605810426, 191), z_dir=(0, 0, 1)), keep=Keep.TOP, mode=Mode.PRIVATE)
    rdondeo_piece_10 = split(rdondeo_piece_10, bisect_by=Plane(origin=(137.12365429, 67.397480238, 191.540834917), z_dir=(0.4586429197702524, -0.8886206570548638, 0)), keep=Keep.TOP, mode=Mode.PRIVATE)
    add(rdondeo_piece_10)

    # Sketch23 → Cut-Extrude5 (cut)
    with BuildSketch(Plane(origin=(0, 0, 0), x_dir=(0.8886206570548638, 0.45864291977025234, 0), z_dir=(-0.4586429197702524, 0.8886206570548639, 0))):
        with Locations((38.296266456, -97.30278137)):
            Rectangle(SKETCH23_W, SKETCH23_H)
    extrude(amount=CUT_EXTRUDE5_DEPTH, mode=Mode.SUBTRACT)

    # Sketch24 → Cut-Extrude6 (cut)
    with BuildSketch(Plane(origin=(0, 80, 0), x_dir=(1, 0, 0), z_dir=(0, 1, 0))):
        with Locations((193.25, -97.5)):
            Rectangle(SKETCH24_W, SKETCH24_H)
    extrude(amount=-CUT_EXTRUDE6_DEPTH, mode=Mode.SUBTRACT)

    # Sketch25 → Boss-Extrude3 (add)
    with BuildSketch(Plane(origin=(0, 3, 0), x_dir=(1, 0, 0), z_dir=(0, 1, 0))):
        with Locations((189.69983474, -6.953484272)):
            Rectangle(SKETCH25_W, SKETCH25_H)
    boss_extrude3 = extrude(amount=BOSS_EXTRUDE3_DEPTH)

    # Mirror2: Boss-Extrude3 across plane
    add(boss_extrude3.mirror(Plane.XY.offset(97.5)))

    # Sketch37 → Avellanado para tornillo con cabeza plana de M31 (revolve, cut)
    with BuildSketch(Plane(origin=(190, 0, 190), x_dir=(0, 0, -1), z_dir=(1, 0, 0))):
        Polygon((0, 0), (0, 10.96137699), (1.6, 10), (1.6, 1.55), (3.15, 0), align=None)
    avellanado_para_tornillo_con_cabeza_plan = revolve(axis=Axis((190, -6.35, 190), (0, 1, 0)), mode=Mode.SUBTRACT)

    # Mirror4: Avellanado para tornillo con cabeza plana de M31 across plane
    add(avellanado_para_tornillo_con_cabeza_plan.mirror(Plane.XY.offset(97.5)), mode=Mode.SUBTRACT)

    # Mirror5: Avellanado para tornillo con cabeza plana de M31 across plane
    add(avellanado_para_tornillo_con_cabeza_plan.mirror(Plane(origin=(97.5, 0, 0), x_dir=(0, 0, 1), z_dir=(1, 0, 0))), mode=Mode.SUBTRACT)

    # Mirror5 copy 1 sketch → Mirror5 copy 1 (revolve, cut)
    with BuildSketch(Plane(origin=(5, 0, 5), x_dir=(0, 0, 1), z_dir=(-1, 0, 0))):
        Polygon((0, 0), (0, 10.96137699), (1.6, 10), (1.6, 1.55), (3.15, 0), align=None)
    revolve(axis=Axis((5, -6.35, 5), (0, 1, 0)), mode=Mode.SUBTRACT)

    # Sketch38 → Boss-Extrude4 (add)
    # profile 1 of 3: a face of its own
    with BuildSketch(Plane(origin=(0, 0, 0), x_dir=(1, 0, 0), z_dir=(0, 1, 0))):
        with Locations((29.586672151, -11.653240068)):
            Rectangle(SKETCH38_W, SKETCH38_H)
        with Locations((29.586672151, -11.653240068)):
            Rectangle(SKETCH38_W_2, SKETCH38_H_2, mode=Mode.SUBTRACT)
    # profile 2 of 3: a face of its own
    with BuildSketch(Plane(origin=(0, 0, 0), x_dir=(1, 0, 0), z_dir=(0, 1, 0))):
        with Locations((29.586672151, -97.742605126)):
            Rectangle(SKETCH38_W, SKETCH38_H_3)
        with Locations((29.586672151, -97.742605126)):
            Rectangle(SKETCH38_W_2, SKETCH38_H_4, mode=Mode.SUBTRACT)
    # profile 3 of 3: a face of its own
    with BuildSketch(Plane(origin=(0, 0, 0), x_dir=(1, 0, 0), z_dir=(0, 1, 0))):
        with Locations((29.586672151, -183.532080006)):
            Rectangle(SKETCH38_W, SKETCH38_H_5)
        with Locations((29.586672151, -183.532080006)):
            Rectangle(SKETCH38_W_2, SKETCH38_H_6, mode=Mode.SUBTRACT)
    extrude(amount=BOSS_EXTRUDE4_DEPTH)

    # Sketch40 → Agujeros rampa (cut)
    with BuildSketch(Plane(origin=(0, 0, 0), x_dir=(0.8886206570548638, 0.45864291977025234, 0), z_dir=(-0.4586429197702524, 0.8886206570548639, 0))):
        with Locations(Location((89.877096201, -21.666666667, 0), (0, 0, 180))):
            Circle(SKETCH40_R)
        with Locations(Location((89.877096201, -43.333333333, 0), (0, 0, 180))):
            Circle(SKETCH40_R)
        with Locations(Location((89.877096201, -65, 0), (0, 0, 180))):
            Circle(SKETCH40_R)
        with Locations(Location((89.877096201, -86.666666667, 0), (0, 0, 180))):
            Circle(SKETCH40_R)
        with Locations(Location((89.877096201, -4, 0), (0, 0, 180))):
            Circle(SKETCH40_R_2)
    agujeros_rampa = extrude(amount=-AGUJEROS_RAMPA_DEPTH, mode=Mode.SUBTRACT)

    # Mirror7: Agujeros rampa across plane
    add(agujeros_rampa.mirror(Plane.XY.offset(97.5)), mode=Mode.SUBTRACT)


solid = part.part
